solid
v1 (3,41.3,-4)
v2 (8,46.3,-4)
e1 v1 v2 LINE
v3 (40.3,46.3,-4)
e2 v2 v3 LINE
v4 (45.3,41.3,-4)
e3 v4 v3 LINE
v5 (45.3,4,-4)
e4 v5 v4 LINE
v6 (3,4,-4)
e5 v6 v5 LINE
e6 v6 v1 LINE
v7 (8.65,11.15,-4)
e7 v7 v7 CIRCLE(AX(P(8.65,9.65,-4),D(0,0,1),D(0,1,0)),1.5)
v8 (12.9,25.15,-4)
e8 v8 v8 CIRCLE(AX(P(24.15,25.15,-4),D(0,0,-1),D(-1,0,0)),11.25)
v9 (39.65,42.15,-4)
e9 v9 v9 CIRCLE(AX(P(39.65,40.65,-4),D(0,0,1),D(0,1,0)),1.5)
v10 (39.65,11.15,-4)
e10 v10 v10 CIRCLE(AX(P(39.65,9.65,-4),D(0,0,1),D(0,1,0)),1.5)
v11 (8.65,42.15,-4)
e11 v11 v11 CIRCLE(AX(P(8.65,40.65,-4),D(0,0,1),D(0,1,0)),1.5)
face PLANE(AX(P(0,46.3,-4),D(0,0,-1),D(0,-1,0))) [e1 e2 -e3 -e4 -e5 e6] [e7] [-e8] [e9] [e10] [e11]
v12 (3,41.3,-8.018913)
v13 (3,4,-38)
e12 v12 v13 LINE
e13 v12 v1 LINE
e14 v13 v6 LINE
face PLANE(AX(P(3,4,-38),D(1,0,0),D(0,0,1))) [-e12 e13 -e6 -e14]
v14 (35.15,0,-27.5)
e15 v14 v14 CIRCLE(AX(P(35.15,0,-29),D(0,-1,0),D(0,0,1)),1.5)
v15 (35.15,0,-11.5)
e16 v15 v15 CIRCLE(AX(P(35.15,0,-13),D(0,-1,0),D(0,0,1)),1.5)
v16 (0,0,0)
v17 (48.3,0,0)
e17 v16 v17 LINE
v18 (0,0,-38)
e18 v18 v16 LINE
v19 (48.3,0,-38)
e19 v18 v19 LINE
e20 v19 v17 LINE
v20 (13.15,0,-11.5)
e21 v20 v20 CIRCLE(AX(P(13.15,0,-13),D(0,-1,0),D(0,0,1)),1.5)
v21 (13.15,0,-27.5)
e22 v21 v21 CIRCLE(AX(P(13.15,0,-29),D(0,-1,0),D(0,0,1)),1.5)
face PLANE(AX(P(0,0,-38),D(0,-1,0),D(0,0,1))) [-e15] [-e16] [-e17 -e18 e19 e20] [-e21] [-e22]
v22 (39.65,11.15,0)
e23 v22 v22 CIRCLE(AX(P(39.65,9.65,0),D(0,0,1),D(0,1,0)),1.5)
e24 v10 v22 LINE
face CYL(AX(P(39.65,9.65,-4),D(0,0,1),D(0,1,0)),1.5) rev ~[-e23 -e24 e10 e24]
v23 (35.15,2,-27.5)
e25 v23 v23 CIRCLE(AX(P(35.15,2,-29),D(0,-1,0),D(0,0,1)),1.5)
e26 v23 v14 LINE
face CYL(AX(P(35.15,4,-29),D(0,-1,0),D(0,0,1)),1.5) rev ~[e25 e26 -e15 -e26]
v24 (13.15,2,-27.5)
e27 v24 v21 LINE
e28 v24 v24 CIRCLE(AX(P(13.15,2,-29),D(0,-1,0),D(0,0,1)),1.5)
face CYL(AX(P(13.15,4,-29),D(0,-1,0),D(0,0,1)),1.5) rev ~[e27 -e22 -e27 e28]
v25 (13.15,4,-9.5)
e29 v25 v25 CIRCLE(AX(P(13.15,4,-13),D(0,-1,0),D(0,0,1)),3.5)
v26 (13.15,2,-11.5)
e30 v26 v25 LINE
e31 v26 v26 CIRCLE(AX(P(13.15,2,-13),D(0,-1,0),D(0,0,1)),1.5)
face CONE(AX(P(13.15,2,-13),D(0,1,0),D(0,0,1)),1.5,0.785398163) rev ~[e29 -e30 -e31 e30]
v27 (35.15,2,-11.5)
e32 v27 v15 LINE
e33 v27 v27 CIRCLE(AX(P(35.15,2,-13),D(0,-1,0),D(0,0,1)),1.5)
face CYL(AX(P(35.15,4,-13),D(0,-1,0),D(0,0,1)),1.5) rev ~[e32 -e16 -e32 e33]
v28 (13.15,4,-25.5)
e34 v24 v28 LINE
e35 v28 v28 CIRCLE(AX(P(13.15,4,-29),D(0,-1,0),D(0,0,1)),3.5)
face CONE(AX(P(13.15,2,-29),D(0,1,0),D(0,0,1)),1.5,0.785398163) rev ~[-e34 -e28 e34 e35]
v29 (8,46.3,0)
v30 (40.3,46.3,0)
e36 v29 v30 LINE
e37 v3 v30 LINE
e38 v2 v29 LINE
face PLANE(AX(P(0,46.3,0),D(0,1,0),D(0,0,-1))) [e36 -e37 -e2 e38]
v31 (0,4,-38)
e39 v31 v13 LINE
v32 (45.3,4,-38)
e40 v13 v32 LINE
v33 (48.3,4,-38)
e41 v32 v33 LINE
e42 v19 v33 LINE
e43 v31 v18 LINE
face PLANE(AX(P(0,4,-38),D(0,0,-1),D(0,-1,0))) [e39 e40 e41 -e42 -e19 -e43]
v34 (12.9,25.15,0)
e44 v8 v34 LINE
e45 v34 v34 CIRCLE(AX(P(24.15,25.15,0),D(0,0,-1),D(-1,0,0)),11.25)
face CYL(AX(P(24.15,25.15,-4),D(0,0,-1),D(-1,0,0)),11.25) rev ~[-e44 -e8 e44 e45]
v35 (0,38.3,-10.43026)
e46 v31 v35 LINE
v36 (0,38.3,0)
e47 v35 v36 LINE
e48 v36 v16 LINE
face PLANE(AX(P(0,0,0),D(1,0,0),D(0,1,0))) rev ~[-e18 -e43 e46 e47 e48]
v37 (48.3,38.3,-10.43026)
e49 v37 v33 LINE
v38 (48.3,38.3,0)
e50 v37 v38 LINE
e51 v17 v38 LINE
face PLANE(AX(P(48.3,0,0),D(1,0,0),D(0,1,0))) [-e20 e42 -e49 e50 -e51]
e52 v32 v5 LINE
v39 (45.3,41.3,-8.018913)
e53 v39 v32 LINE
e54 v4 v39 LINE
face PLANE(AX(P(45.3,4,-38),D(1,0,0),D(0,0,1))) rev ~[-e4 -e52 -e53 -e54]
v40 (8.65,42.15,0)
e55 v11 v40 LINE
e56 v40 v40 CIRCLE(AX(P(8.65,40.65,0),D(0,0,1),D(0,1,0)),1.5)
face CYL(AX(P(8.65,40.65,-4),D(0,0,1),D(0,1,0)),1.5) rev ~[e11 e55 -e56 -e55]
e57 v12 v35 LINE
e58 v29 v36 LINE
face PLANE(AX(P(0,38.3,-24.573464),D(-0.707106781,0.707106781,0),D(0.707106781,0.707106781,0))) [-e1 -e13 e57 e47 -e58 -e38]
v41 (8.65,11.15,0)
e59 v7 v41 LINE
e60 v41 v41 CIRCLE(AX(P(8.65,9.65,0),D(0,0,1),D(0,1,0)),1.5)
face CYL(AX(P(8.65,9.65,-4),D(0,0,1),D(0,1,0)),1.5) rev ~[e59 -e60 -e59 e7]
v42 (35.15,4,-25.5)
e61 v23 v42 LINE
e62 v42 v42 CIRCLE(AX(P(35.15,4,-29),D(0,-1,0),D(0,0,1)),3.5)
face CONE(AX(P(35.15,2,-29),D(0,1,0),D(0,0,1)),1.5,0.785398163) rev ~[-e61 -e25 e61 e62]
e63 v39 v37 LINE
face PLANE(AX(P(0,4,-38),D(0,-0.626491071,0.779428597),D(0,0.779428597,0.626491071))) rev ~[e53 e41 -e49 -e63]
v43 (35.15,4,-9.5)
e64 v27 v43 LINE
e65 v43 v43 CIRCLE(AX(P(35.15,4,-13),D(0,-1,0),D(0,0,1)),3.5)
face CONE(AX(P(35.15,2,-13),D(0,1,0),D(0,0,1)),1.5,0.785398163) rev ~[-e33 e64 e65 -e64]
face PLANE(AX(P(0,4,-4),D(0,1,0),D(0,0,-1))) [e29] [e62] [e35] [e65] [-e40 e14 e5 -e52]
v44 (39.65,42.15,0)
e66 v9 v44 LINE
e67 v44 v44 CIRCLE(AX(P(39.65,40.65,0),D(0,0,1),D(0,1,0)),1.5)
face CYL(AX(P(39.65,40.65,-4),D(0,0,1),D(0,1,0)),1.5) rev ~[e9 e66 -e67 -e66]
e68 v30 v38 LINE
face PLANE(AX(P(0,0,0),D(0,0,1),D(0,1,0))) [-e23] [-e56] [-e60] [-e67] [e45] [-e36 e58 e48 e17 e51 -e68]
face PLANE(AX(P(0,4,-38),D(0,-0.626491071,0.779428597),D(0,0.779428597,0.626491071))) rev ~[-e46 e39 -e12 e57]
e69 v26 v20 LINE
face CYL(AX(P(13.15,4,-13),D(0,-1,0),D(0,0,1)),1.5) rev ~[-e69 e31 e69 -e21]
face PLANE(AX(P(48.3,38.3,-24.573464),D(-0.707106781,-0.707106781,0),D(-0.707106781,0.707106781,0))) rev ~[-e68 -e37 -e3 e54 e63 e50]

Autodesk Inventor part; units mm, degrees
ref_plane "YZ Plane" through (0, 0, 0) normal (1, 0, 0) x (0, 1, 0)
ref_plane "XZ Plane" through (0, 0, 0) normal (0, 1, 0) x (-1, 0, 0)
ref_plane "XY Plane" through (0, 0, 0) normal (0, 0, 1) x (1, 0, 0)
sketch "Szkic5" plane through (0, 0, 0) normal (1, 0, 0) x (0, 1, 0)
  line L0 (0, 0) -> (4, 0)
  line L1 (4, 0) -> (4, -38)
  line L2 (4, -38) -> (0, -38)
  line L3 (0, -38) -> (0, 0)
  line L4 (4, 0) -> (46.3, 0)
  line L5 (46.3, 0) -> (46.3, -4)
  line L6 (46.3, -4) -> (4, -4)
  line L7 (4, -4) -> (4, 0)
  dimension "d10" = 4
  dimension "d11" = 38
  dimension "d12" = 42.3
  dimension "d13" = 4
extrude "Wyciągnięcie proste2" add sketch "Szkic5" along normal blind 48.3
sketch "Szkic6" plane through (0, 4, -4) normal (0, 1, 0) x (1, 0, 0)
  line L0 (48.3, -4) -> (48.3, 34) projected
  line L1 (48.3, 34) -> (45.3, 34)
  line L2 (45.3, 34) -> (45.3, 0)
  line L3 (45.3, 0) -> (48.3, 0)
  line L4 (48.3, 0) -> (48.3, 34)
  line L5 (0, -4) -> (0, 34) projected
  line L6 (0, 34) -> (3, 34)
  line L7 (3, 34) -> (3, 0)
  line L8 (3, 0) -> (0, 0)
  line L9 (0, 0) -> (0, 34)
  dimension "d16" = 3
  dimension "d17" = 34
  dimension "d18" = 3
  dimension "d19" = 34
extrude "Wyciągnięcie proste3" add sketch "Szkic6" along normal blind 42.3
sketch "Szkic7" plane through (0, 0, 0) normal (-1, 0, 0) x (0, 0, 1)
  line L0 (-4, 46.3) -> (-38, 46.3) projected
  line L1 (-4, 46.3) -> (-38, 46.3)
  line L2 (-38, 4) -> (-38, 46.3) projected
  line L3 (-38, 46.3) -> (-38, 4)
  line L4 (-38, 4) -> (-4, 46.3)
  point P0 (0, 0)
extrude "Wyciągnięcie proste4" cut sketch "Szkic7" against normal through all
sketch "Szkic8" plane through (45.3, 4, -4) normal (0, 0, -1) x (-1, 0, 0)
  line L0 (45.3, 42.3) -> (-3, 42.3) projected
  line L1 (-3, 0) -> (-3, 42.3) projected
  line L2 (0, 42.3) -> (0, 0) projected
  circle A0 centre (21.15, 21.15) radius 11.25
  point P0 (45.3, -4)
  dimension "d24" = 21.15
  dimension "d26" = 21.15
  dimension "d27" = 22.5
extrude "Wyciągnięcie proste5" cut sketch "Szkic8" against normal blind 42.3
sketch "Szkic9" plane through (45.3, 4, -4) normal (0, 0, -1) x (-1, 0, 0)
  line L0 (45.3, 42.3) -> (-3, 42.3) projected
  line L1 (21.15, 42.3) -> (21.15, 0) construction
  line L2 (42.3, 0) -> (0, 0) projected
  line L3 (0, 42.3) -> (0, 0) projected
  line L4 (0, 21.15) -> (42.3, 21.15) construction
  line L5 (45.3, 42.3) -> (45.3, -4) projected
  point P0 (5.65, 36.65)
  point P1 (36.65, 36.65)
  point P2 (5.65, 5.65)
  point P3 (36.65, 5.65)
  dimension "d30" = 15.5
  dimension "d31" = 15.5
hole "Otwór1" at (39.65, 40.65, -4) at (8.65, 40.65, -4) at (39.65, 9.65, -4) at (8.65, 9.65, -4) direction (0, 0, 1) diameter 3 depth 8 tip angle 118
sketch "Szkic10" plane through (3, 4, -4) normal (0, 1, 0) x (1, 0, 0)
  line L0 (9.9, 0) -> (32.4, 0) projected
  line L1 (21.15, 0) -> (21.15, 34) construction
  line L2 (0, 34) -> (42.3, 34) projected
  line L3 (42.3, 0) -> (42.3, 34) projected
  line L4 (42.3, 17) -> (0, 17) construction
  line L5 (0, 34) -> (0, 0) projected
  point P0 (-3, -4)
  point P1 (32.15, 9)
  point P2 (10.15, 9)
  point P3 (32.15, 25)
  point P4 (10.15, 25)
  dimension "d39" = 11
  dimension "d40" = 8
hole "Otwór2" at (35.15, 4, -13) at (13.15, 4, -13) at (35.15, 4, -29) at (13.15, 4, -29) direction (0, -1, 0) diameter 3 depth 8 tip angle 118
chamfer "Faza1" distance 2 angle 45 4 edges at (35.15, 4, -14.5) (13.15, 4, -14.5) (35.15, 4, -30.5) (13.15, 4, -30.5)
chamfer "Faza2" distance 8 angle 45 2 edges at (48.3, 46.3, -2) (0, 46.3, -2)
properties part number "Ucwyt_NEMA17"
